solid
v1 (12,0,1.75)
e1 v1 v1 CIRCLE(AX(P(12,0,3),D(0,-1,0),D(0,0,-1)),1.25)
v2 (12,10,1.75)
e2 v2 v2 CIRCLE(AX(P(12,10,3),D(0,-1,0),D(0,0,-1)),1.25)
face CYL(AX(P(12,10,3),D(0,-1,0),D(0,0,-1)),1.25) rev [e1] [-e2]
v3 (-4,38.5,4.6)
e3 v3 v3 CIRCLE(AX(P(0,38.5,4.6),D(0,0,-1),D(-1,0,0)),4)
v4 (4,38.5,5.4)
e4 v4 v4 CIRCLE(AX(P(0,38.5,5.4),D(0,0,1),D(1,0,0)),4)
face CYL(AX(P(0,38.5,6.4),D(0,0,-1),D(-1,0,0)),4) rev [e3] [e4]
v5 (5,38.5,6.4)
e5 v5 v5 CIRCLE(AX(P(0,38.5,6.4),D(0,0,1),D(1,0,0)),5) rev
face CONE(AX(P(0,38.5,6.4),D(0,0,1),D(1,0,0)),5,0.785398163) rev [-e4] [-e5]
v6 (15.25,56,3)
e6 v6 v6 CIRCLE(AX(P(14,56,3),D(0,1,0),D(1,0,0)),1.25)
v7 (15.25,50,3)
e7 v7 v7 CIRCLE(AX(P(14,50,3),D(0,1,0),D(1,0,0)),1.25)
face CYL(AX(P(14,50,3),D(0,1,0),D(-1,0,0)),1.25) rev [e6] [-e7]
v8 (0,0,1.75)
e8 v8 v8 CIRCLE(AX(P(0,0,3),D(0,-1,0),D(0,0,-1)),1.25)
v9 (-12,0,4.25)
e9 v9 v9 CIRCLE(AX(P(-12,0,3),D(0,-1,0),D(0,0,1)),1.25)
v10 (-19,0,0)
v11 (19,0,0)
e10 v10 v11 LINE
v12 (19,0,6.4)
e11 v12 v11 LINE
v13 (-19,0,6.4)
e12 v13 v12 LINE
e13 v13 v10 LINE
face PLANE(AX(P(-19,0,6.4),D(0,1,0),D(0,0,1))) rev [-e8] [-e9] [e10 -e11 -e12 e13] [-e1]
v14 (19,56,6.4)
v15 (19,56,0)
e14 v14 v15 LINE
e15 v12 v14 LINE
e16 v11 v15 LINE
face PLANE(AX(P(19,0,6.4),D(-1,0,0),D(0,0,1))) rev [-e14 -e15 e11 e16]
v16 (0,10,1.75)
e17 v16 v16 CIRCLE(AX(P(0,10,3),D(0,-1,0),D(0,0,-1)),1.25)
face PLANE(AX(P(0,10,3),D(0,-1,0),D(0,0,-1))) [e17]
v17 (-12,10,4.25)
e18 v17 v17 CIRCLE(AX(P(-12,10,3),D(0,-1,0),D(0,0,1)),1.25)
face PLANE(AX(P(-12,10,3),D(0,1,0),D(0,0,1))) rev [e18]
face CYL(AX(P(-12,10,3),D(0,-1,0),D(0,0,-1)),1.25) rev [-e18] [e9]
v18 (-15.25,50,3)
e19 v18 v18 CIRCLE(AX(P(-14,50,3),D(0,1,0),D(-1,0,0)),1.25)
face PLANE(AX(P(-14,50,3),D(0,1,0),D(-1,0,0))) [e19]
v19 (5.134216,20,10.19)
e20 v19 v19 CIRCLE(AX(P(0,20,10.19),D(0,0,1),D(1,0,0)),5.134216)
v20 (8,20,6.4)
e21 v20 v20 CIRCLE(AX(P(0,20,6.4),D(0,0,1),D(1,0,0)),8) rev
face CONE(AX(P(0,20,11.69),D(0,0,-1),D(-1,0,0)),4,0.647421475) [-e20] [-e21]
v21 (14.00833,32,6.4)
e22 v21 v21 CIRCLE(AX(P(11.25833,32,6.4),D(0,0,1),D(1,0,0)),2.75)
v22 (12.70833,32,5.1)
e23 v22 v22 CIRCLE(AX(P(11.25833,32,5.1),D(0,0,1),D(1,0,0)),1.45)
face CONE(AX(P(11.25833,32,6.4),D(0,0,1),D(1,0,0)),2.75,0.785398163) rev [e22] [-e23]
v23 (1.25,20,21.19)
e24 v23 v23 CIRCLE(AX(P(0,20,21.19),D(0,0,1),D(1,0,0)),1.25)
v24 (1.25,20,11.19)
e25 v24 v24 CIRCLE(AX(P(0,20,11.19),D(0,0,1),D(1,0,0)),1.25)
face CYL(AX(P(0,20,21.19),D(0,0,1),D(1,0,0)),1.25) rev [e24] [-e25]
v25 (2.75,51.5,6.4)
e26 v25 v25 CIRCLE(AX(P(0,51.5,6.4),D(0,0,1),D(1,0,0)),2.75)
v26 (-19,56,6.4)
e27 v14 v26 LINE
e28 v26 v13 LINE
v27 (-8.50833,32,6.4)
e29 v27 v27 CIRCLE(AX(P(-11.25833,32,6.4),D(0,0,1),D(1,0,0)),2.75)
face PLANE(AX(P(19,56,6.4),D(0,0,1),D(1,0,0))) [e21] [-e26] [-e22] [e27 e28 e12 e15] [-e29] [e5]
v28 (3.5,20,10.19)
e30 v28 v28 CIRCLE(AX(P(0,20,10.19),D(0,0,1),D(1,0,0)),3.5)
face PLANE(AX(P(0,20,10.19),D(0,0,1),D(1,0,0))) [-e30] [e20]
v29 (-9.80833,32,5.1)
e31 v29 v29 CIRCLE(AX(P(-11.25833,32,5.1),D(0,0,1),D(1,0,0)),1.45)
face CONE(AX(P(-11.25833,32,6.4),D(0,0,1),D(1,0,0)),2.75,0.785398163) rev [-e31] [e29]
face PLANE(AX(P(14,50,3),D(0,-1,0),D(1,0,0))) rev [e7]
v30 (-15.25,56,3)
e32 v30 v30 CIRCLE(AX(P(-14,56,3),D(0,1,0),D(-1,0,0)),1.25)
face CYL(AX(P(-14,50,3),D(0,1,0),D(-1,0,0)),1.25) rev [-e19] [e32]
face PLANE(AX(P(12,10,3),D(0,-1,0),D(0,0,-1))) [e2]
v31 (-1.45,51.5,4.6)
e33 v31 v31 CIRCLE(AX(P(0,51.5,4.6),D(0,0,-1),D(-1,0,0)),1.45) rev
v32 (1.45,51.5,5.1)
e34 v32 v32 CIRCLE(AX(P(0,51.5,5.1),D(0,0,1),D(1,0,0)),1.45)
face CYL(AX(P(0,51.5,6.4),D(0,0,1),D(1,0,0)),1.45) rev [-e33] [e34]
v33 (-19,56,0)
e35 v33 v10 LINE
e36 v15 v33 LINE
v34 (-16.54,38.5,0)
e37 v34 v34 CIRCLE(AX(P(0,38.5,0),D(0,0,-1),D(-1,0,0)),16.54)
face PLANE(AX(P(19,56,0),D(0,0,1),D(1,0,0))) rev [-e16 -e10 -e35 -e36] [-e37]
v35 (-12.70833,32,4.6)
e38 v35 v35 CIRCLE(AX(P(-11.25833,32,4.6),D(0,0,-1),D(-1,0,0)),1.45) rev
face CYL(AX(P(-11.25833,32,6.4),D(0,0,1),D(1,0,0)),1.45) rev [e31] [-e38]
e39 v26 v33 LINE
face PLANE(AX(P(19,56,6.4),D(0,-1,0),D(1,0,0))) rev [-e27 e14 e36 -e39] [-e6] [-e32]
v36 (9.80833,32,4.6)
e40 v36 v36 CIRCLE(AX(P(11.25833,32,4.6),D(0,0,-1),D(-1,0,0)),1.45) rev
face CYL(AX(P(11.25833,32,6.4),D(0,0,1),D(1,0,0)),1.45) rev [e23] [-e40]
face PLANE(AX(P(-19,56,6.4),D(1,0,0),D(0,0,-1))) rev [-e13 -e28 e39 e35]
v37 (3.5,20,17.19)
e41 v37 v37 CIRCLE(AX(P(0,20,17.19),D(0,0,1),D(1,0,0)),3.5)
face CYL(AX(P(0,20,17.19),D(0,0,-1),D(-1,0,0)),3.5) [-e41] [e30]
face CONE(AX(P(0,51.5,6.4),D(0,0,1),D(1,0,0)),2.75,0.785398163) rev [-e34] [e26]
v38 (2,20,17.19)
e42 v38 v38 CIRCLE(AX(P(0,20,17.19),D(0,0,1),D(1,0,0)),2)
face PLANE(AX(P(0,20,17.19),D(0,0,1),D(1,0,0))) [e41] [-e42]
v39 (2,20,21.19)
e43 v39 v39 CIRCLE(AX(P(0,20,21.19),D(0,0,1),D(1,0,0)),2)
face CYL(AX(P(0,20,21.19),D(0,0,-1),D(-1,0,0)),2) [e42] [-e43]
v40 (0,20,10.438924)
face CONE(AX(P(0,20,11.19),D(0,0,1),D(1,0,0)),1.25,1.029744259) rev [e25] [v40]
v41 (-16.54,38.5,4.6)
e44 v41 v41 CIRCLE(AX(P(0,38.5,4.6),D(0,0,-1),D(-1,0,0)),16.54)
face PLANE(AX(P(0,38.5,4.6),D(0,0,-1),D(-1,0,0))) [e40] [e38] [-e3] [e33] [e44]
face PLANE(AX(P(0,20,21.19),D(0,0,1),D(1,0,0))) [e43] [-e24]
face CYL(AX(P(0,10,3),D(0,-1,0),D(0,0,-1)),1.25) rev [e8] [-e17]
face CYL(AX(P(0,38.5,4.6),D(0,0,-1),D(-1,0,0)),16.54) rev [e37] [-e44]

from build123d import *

# Parameters (mm, degrees)
ESBO_O1_W                     = 38
ESBO_O1_H                     = 56
ESBO_O1_R                     = 4
RESSALTO_EXTRUS_O1_DEPTH      = 6.4
ESBO_O6_R                     = 16.54
CORTE_EXTRUS_O5_DEPTH         = 4.6
ESBO_O7_R                     = 4
ESBO_O7_R_2                   = 1.25
CORTE_EXTRUS_O6_DEPTH         = 60.314079273
RESSALTO_EXTRUS_O2_DEPTH      = 4.6
RESSALTO_EXTRUS_O3_DEPTH      = 5.59
ESBO_O17_R                    = 3.5
RESSALTO_EXTRUS_O4_DEPTH      = 7
ESBO_O18_R                    = 2
RESSALTO_EXTRUS_O5_DEPTH      = 4
CHANFRO1_SIZE                 = 4
CHANFRO1_SIZE_2               = 5.29
FURO_ROSCADO_DE_M3X0_51_D     = 2.5
FURO_ROSCADO_DE_M3X0_51_DEPTH = 10
FURO_ROSCADO_DE_M3X0_51_TIP   = 0.751075774
CHANFRO2_SIZE                 = 1
SKETCH1_R                     = 1.25
CUT_EXTRUDE1_DEPTH            = 6
SKETCH2_R                     = 1.25
CUT_EXTRUDE2_DEPTH            = 10


# Read off the part's stored shape, not the designer's step: Escareado para parafuso de máquina com cabeça chata de M2.51
with BuildPart() as part:
    # Esboço1 → Ressalto-extrusão1 (new body)
    with BuildSketch(Plane.XY):
        with Locations((0, 28)):
            Rectangle(ESBO_O1_W, ESBO_O1_H)
        with Locations((0, 20)):
            Circle(ESBO_O1_R, mode=Mode.SUBTRACT)
    extrude(amount=RESSALTO_EXTRUS_O1_DEPTH)

    # Esboço6 → Corte-extrusão5 (cut)
    with BuildSketch(Plane(origin=(0, 0, 0), x_dir=(-1, 0, 0), z_dir=(0, 0, -1))):
        with Locations((0, 38.5)):
            Circle(ESBO_O6_R)
    extrude(amount=-CORTE_EXTRUS_O5_DEPTH, mode=Mode.SUBTRACT)

    # Esboço7 → Corte-extrusão6 (cut, through all)
    with BuildSketch(Plane(origin=(0, 0, 4.6), x_dir=(-1, 0, 0), z_dir=(0, 0, -1))):
        with Locations((0, 38.5)):
            Circle(ESBO_O7_R)
        with Locations((11.258330249, 32)):
            Circle(ESBO_O7_R_2)
        with Locations((-11.258330249, 32)):
            Circle(ESBO_O7_R_2)
        with Locations((0, 51.5)):
            Circle(ESBO_O7_R_2)
    extrude(amount=-CORTE_EXTRUS_O6_DEPTH, mode=Mode.SUBTRACT)

    # Escareado para parafuso de m_quina c 2 → Escareado para parafuso de máquina com cabeça chata de M2.51 (revolve, cut)
    with BuildSketch(Plane(origin=(-11.258330249, 32, 0), x_dir=(1, 0, 0), z_dir=(0, -1, 0))):
        Polygon((1.25, 4.6), (1.45, 4.6), (1.45, 5.1), (2.75, 6.4), (1.25, 6.4), align=None)
    revolve(axis=Axis((-11.258330249, 32, 0), (0, 0, 1)), mode=Mode.SUBTRACT)

    # Escareado para parafuso de m_quina c 3 o → Escareado para parafuso de m_quina c 3 (revolve, cut)
    with BuildSketch(Plane(origin=(11.258330249, 32, 0), x_dir=(1, 0, 0), z_dir=(0, -1, 0))):
        Polygon((1.25, 4.6), (1.45, 4.6), (1.45, 5.1), (2.75, 6.4), (1.25, 6.4), align=None)
    revolve(axis=Axis((11.258330249, 32, 0), (0, 0, 1)), mode=Mode.SUBTRACT)

    # Escareado para parafuso de m_quina c 4 o → Escareado para parafuso de m_quina c 4 (revolve, cut)
    with BuildSketch(Plane.XZ.offset(-51.5)):
        Polygon((1.25, 4.6), (1.45, 4.6), (1.45, 5.1), (2.75, 6.4), (1.25, 6.4), align=None)
    revolve(axis=Axis((0, 51.5, 0), (0, 0, 1)), mode=Mode.SUBTRACT)

    # Esboço15 → Ressalto-extrusão2 (add)
    with BuildSketch(Plane(origin=(0, 0, 0), x_dir=(-1, 0, 0), z_dir=(0, 0, -1))):
        with BuildLine():
            ThreePointArc((-3.280592218, 22.288605405), (0, 16), (3.280592218, 22.288605405))
            ThreePointArc((3.280592218, 22.288605405), (0, 21.96), (-3.280592218, 22.288605405))
        make_face()
    extrude(amount=-RESSALTO_EXTRUS_O2_DEPTH)

    # Esboço16 → Ressalto-extrusão3 (add)
    with BuildSketch(Plane.XY.offset(4.6)):
        with BuildLine():
            ThreePointArc((-3.280592218, 22.288605405), (0, 16), (3.280592218, 22.288605405))
            ThreePointArc((3.280592218, 22.288605405), (0, 24), (-3.280592218, 22.288605405))
        make_face()
    extrude(amount=RESSALTO_EXTRUS_O3_DEPTH)

    # Esboço17 → Ressalto-extrusão4 (add)
    with BuildSketch(Plane.XY.offset(10.19)):
        with Locations((0, 20)):
            Circle(ESBO_O17_R)
    extrude(amount=RESSALTO_EXTRUS_O4_DEPTH)

    # Esboço18 → Ressalto-extrusão5 (add)
    with BuildSketch(Plane.XY.offset(17.19)):
        with Locations((0, 20)):
            Circle(ESBO_O18_R)
    extrude(amount=RESSALTO_EXTRUS_O5_DEPTH)

    # Chanfro1
    # the kernel refuses this chamfer: 5.29, 4 mm, written as the material it adds along each edge
    with BuildSketch(Plane(origin=(0, 20, 6.4), x_dir=(0.8201480544065356, 0.5721513513513485, 0), z_dir=(-0.5721513513513485, 0.8201480544065356, 0))) as chanfro1_piece_1_section:
        Polygon((4 + CHANFRO1_SIZE, 0), (4, -CHANFRO1_SIZE_2), (4, 0), align=None)
    chanfro1_piece_1 = revolve(axis=Axis((0, 20, 6.4), (0, 0, -1)), mode=Mode.PRIVATE)
    chanfro1_piece_1 = split(chanfro1_piece_1, bisect_by=Plane(origin=(-5.391672128, 16.238663888, 10.19), z_dir=(0, 0, -1)), keep=Keep.TOP, mode=Mode.PRIVATE)
    add(chanfro1_piece_1)

    # Furo roscado de M3x0.51
    with Locations(Plane.XY.offset(21.19)):
        with Locations((0, 20)):
            Hole(FURO_ROSCADO_DE_M3X0_51_D / 2, depth=FURO_ROSCADO_DE_M3X0_51_DEPTH)
            with Locations((0, 0, -(FURO_ROSCADO_DE_M3X0_51_DEPTH + FURO_ROSCADO_DE_M3X0_51_TIP / 2))):  # 118° drill point
                Cone(0, FURO_ROSCADO_DE_M3X0_51_D / 2, FURO_ROSCADO_DE_M3X0_51_TIP, mode=Mode.SUBTRACT)

    # Chanfro2
    chanfro2_edges = [part.edges().sort_by_distance(p)[0] for p in [
        (4, 38.5, 6.4),
    ]]
    chamfer(chanfro2_edges, length=CHANFRO2_SIZE)

    # Sketch1 → Cut-Extrude1 (cut)
    with BuildSketch(Plane(origin=(0, 56, 0), x_dir=(1, 0, 0), z_dir=(0, 1, 0))):
        with Locations(Location((-14, -3, 0), (0, 0, 180))):
            Circle(SKETCH1_R)
        with Locations((14, -3)):
            Circle(SKETCH1_R)
    extrude(amount=-CUT_EXTRUDE1_DEPTH, mode=Mode.SUBTRACT)

    # Sketch2 → Cut-Extrude2 (cut)
    with BuildSketch(Plane(origin=(0, 0, 0), x_dir=(-1, 0, 0), z_dir=(0, -1, 0))):
        with Locations(Location((-12, -3, 0), (0, 0, 90))):
            Circle(SKETCH2_R)
        with Locations(Location((0, -3, 0), (0, 0, 90))):
            Circle(SKETCH2_R)
        with Locations(Location((12, -3, 0), (0, 0, 270))):
            Circle(SKETCH2_R)
    extrude(amount=-CUT_EXTRUDE2_DEPTH, mode=Mode.SUBTRACT)


solid = part.part
